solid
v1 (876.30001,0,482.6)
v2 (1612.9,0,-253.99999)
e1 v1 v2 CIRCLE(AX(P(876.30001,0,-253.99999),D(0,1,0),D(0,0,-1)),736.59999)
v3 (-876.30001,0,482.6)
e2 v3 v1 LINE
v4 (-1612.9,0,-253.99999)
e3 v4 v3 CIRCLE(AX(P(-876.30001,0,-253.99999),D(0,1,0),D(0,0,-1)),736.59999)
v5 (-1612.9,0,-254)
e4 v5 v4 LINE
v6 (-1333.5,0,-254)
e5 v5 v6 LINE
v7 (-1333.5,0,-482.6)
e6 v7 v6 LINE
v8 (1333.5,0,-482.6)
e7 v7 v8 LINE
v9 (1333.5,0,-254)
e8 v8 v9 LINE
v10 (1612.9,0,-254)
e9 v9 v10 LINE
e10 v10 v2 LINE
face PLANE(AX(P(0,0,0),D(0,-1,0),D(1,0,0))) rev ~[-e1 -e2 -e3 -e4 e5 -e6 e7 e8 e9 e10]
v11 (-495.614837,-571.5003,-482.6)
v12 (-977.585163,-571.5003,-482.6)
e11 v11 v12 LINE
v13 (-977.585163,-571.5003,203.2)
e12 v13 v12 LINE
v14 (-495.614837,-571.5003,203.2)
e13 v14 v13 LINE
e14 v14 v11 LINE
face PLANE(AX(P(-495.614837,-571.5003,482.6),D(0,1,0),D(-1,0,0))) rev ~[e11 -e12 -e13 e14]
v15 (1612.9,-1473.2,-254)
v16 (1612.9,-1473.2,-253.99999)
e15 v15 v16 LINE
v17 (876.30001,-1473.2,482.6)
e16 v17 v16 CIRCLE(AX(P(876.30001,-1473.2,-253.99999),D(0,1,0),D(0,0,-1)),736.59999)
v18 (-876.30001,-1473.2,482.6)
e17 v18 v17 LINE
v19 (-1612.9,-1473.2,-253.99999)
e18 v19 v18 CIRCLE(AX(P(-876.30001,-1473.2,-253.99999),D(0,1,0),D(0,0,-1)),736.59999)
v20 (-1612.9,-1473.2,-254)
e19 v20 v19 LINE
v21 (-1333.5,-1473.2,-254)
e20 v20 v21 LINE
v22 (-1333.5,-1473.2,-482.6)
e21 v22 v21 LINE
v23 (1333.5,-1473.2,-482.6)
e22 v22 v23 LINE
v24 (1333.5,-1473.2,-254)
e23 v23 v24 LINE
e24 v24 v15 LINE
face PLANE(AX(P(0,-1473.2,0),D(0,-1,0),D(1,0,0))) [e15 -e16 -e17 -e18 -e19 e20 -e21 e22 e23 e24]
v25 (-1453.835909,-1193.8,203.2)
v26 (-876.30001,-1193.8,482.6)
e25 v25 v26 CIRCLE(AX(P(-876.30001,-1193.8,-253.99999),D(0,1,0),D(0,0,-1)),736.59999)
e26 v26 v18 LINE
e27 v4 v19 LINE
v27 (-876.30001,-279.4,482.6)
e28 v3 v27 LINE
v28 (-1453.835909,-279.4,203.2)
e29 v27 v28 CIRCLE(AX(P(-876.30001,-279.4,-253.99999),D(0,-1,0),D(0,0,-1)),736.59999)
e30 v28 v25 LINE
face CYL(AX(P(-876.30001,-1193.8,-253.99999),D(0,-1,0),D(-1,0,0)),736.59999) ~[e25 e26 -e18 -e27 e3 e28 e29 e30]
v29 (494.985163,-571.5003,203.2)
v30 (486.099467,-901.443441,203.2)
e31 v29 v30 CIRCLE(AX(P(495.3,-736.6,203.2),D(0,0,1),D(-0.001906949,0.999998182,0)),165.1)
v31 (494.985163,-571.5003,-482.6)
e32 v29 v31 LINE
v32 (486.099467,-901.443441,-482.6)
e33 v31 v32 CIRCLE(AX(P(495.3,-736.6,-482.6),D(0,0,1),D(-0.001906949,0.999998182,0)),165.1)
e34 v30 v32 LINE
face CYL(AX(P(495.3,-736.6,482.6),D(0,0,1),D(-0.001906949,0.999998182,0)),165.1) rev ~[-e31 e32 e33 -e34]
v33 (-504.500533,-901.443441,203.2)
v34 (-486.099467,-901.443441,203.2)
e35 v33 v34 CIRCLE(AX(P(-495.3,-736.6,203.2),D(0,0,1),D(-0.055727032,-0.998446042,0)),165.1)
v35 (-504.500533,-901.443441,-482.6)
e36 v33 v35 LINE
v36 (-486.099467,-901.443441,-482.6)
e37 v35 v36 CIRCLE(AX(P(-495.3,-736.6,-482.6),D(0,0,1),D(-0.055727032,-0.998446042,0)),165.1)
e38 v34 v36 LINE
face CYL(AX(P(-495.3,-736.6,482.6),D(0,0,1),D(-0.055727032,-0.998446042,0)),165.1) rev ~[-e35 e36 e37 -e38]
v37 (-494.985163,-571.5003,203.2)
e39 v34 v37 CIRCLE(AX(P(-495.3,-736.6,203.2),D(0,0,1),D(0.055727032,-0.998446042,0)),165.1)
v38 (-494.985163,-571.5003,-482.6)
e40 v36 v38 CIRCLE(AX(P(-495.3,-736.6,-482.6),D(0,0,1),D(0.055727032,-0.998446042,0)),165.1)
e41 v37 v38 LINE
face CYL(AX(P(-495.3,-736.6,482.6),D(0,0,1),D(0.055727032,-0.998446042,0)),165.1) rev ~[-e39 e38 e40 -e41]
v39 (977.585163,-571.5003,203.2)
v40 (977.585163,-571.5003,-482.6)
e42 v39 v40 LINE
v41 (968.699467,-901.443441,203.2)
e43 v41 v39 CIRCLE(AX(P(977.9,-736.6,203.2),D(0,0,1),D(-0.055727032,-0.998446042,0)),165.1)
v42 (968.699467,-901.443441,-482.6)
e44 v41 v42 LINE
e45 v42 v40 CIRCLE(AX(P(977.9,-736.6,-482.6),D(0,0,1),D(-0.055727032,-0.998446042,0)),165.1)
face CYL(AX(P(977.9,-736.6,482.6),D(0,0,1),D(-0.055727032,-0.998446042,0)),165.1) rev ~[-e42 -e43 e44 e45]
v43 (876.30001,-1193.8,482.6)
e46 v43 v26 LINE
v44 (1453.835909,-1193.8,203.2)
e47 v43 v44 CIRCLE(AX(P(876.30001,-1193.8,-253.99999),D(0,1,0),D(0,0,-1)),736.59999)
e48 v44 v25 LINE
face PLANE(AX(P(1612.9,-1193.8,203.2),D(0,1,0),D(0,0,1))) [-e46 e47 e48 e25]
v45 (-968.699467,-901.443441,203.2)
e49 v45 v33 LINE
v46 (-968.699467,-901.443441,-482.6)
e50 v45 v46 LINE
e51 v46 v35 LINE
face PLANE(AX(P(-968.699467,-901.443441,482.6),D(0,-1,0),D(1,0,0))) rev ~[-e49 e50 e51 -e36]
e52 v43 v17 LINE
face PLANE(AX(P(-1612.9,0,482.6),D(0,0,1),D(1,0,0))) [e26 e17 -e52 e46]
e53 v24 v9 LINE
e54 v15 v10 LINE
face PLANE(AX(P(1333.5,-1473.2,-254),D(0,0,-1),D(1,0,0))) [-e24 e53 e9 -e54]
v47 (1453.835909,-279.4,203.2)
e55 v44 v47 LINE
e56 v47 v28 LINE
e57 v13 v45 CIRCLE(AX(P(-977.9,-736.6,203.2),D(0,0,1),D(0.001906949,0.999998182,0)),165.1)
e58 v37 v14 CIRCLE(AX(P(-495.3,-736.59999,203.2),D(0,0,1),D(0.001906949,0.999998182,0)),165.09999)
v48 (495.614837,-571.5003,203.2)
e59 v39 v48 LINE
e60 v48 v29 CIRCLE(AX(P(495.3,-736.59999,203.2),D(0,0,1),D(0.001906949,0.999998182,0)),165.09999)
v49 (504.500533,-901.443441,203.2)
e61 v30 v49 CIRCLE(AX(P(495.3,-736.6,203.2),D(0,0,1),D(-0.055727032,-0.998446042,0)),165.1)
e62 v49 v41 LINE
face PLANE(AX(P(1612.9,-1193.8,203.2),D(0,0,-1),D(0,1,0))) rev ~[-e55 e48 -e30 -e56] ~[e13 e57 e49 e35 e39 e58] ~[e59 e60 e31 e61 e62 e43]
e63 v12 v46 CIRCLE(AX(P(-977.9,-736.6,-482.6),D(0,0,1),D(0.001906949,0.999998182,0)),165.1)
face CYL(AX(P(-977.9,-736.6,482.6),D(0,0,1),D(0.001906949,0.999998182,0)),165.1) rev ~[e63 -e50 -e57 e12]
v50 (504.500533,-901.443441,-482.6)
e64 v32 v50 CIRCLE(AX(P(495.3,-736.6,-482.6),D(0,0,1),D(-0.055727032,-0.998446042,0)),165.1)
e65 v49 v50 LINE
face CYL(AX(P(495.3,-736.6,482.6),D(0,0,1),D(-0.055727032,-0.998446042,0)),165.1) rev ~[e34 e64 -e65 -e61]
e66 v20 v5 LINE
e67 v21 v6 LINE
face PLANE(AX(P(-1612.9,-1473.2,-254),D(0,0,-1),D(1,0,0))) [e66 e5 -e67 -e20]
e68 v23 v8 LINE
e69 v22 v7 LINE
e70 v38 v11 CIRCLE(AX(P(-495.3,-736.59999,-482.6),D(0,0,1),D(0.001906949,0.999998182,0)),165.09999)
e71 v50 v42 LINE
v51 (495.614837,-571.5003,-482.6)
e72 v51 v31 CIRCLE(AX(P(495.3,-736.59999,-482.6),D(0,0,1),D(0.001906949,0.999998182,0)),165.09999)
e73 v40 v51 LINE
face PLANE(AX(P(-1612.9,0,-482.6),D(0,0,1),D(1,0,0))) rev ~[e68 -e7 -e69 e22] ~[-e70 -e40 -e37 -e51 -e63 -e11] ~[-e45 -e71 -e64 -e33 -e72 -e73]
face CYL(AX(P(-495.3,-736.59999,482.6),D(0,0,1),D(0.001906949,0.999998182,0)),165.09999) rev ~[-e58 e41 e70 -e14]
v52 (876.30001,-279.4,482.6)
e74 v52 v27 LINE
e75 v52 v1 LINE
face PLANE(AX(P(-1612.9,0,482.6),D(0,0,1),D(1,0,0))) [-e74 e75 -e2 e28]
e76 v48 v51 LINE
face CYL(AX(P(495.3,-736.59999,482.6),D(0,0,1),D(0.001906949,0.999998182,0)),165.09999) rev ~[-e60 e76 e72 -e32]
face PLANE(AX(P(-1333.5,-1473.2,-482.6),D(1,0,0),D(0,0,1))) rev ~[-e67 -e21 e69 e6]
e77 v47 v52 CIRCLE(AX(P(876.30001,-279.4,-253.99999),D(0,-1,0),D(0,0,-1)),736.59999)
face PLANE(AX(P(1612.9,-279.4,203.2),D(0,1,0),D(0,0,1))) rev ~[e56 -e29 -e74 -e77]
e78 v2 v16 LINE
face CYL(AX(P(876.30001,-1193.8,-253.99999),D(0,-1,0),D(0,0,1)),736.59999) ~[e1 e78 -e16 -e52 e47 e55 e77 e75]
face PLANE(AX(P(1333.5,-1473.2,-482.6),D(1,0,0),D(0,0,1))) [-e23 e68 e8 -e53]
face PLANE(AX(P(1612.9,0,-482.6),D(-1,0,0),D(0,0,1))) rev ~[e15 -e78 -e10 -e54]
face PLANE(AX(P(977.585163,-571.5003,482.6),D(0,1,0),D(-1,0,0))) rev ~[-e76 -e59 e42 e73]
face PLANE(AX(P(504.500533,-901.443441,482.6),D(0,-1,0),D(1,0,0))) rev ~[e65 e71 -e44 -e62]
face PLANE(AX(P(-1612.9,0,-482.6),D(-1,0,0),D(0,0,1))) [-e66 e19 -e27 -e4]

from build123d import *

# Parameters (mm, degrees)
F0_W     = 3225.8
F0_H     = 965.2
F1_DEPTH = 1473.2
F3_DEPTH = 965.201
F4_W     = 914.4
F4_H     = 279.4
F5_DEPTH = 3225.801
F6_W     = 279.4
F6_H     = 228.6
F7_DEPTH = 1473.201
F8_R     = 736.59999


# Not quite as in the source:
# - a fillet or chamfer is up to 0.001 mm smaller than in the source, because OpenCascade refuses the exact size


with BuildPart() as f1:
    # F0 (on Front) → F1 (new body)
    with BuildSketch(Plane.XZ):
        Rectangle(F0_W, F0_H)
    extrude(amount=F1_DEPTH)

    # F2 (on face) → F3 (cut, through all)
    with BuildSketch(Plane.XY.offset(482.6)):
        with BuildLine():
            Line((-495.6148372224, -571.5003001895), (-977.5851627776, -571.5003001895))
            ThreePointArc((-977.5851627776, -571.5003001895), (-1142.9401608263, -741.0446950901), (-968.6994670012, -901.4434414605))
            Line((-968.6994670012, -901.4434414605), (-504.5005329988, -901.4434414605))
            Line((-504.5005329988, -901.4434414605), (-486.0994670012, -901.4434414605))
            ThreePointArc((-486.0994670012, -901.4434414605), (-330.2598391737, -732.15530491), (-494.9851627776, -571.5003001895))
            Line((-494.9851627776, -571.5003001895), (-495.6148372224, -571.5003001895))
        make_face()
        with BuildLine():
            ThreePointArc((-494.9851627776, -571.5003001895), (-495.3, -571.5), (-495.6148372224, -571.5003001895))
            Line((-495.6148372224, -571.5003001895), (-494.9851627776, -571.5003001895))
        make_face()
        with BuildLine():
            Line((-486.0994670012, -901.4434414605), (-504.5005329988, -901.4434414605))
            ThreePointArc((-504.5005329988, -901.4434414605), (-495.3, -901.7), (-486.0994670012, -901.4434414605))
        make_face()
        with BuildLine():
            ThreePointArc((968.6994670012, -901.4434414605), (1142.9401608263, -741.0446950901), (977.5851627776, -571.5003001895))
            Line((977.5851627776, -571.5003001895), (495.6148372224, -571.5003001895))
            Line((495.6148372224, -571.5003001895), (494.9851627776, -571.5003001895))
            ThreePointArc((494.9851627776, -571.5003001895), (330.2598391737, -732.15530491), (486.0994670012, -901.4434414605))
            Line((486.0994670012, -901.4434414605), (504.5005329988, -901.4434414605))
            Line((504.5005329988, -901.4434414605), (968.6994670012, -901.4434414605))
        make_face()
        with BuildLine():
            Line((494.9851627776, -571.5003001895), (495.6148372224, -571.5003001895))
            ThreePointArc((495.6148372224, -571.5003001895), (495.3, -571.5), (494.9851627776, -571.5003001895))
        make_face()
        with BuildLine():
            ThreePointArc((486.0994670012, -901.4434414605), (495.3, -901.7), (504.5005329988, -901.4434414605))
            Line((504.5005329988, -901.4434414605), (486.0994670012, -901.4434414605))
        make_face()
    extrude(amount=-F3_DEPTH, mode=Mode.SUBTRACT)

    # F4 (on face) → F5 (cut, through all)
    with BuildSketch(Plane.YZ.offset(1612.9)):
        with Locations((-736.6, 342.9)):
            Rectangle(F4_W, F4_H)
    extrude(amount=-F5_DEPTH, mode=Mode.SUBTRACT)

    # F6 (on face) → F7 (cut, through all)
    with BuildSketch(Plane.XZ.offset(1473.2)):
        with Locations((-1473.2, -368.3)):
            Rectangle(F6_W, F6_H)
        with Locations((1473.2, -368.3)):
            Rectangle(F6_W, F6_H)
    extrude(amount=-F7_DEPTH, mode=Mode.SUBTRACT)

    # F8 (radius 736.6 in the source; OpenCascade refuses exactly that, so slightly less here)
    f8_edges = [f1.edges().sort_by_distance(p)[0] for p in [
        (-1612.9, -1333.5, 482.6),
        (1612.9, -1333.5, 482.6),
    ]]
    fillet(f8_edges, radius=F8_R)


solid = f1.part
